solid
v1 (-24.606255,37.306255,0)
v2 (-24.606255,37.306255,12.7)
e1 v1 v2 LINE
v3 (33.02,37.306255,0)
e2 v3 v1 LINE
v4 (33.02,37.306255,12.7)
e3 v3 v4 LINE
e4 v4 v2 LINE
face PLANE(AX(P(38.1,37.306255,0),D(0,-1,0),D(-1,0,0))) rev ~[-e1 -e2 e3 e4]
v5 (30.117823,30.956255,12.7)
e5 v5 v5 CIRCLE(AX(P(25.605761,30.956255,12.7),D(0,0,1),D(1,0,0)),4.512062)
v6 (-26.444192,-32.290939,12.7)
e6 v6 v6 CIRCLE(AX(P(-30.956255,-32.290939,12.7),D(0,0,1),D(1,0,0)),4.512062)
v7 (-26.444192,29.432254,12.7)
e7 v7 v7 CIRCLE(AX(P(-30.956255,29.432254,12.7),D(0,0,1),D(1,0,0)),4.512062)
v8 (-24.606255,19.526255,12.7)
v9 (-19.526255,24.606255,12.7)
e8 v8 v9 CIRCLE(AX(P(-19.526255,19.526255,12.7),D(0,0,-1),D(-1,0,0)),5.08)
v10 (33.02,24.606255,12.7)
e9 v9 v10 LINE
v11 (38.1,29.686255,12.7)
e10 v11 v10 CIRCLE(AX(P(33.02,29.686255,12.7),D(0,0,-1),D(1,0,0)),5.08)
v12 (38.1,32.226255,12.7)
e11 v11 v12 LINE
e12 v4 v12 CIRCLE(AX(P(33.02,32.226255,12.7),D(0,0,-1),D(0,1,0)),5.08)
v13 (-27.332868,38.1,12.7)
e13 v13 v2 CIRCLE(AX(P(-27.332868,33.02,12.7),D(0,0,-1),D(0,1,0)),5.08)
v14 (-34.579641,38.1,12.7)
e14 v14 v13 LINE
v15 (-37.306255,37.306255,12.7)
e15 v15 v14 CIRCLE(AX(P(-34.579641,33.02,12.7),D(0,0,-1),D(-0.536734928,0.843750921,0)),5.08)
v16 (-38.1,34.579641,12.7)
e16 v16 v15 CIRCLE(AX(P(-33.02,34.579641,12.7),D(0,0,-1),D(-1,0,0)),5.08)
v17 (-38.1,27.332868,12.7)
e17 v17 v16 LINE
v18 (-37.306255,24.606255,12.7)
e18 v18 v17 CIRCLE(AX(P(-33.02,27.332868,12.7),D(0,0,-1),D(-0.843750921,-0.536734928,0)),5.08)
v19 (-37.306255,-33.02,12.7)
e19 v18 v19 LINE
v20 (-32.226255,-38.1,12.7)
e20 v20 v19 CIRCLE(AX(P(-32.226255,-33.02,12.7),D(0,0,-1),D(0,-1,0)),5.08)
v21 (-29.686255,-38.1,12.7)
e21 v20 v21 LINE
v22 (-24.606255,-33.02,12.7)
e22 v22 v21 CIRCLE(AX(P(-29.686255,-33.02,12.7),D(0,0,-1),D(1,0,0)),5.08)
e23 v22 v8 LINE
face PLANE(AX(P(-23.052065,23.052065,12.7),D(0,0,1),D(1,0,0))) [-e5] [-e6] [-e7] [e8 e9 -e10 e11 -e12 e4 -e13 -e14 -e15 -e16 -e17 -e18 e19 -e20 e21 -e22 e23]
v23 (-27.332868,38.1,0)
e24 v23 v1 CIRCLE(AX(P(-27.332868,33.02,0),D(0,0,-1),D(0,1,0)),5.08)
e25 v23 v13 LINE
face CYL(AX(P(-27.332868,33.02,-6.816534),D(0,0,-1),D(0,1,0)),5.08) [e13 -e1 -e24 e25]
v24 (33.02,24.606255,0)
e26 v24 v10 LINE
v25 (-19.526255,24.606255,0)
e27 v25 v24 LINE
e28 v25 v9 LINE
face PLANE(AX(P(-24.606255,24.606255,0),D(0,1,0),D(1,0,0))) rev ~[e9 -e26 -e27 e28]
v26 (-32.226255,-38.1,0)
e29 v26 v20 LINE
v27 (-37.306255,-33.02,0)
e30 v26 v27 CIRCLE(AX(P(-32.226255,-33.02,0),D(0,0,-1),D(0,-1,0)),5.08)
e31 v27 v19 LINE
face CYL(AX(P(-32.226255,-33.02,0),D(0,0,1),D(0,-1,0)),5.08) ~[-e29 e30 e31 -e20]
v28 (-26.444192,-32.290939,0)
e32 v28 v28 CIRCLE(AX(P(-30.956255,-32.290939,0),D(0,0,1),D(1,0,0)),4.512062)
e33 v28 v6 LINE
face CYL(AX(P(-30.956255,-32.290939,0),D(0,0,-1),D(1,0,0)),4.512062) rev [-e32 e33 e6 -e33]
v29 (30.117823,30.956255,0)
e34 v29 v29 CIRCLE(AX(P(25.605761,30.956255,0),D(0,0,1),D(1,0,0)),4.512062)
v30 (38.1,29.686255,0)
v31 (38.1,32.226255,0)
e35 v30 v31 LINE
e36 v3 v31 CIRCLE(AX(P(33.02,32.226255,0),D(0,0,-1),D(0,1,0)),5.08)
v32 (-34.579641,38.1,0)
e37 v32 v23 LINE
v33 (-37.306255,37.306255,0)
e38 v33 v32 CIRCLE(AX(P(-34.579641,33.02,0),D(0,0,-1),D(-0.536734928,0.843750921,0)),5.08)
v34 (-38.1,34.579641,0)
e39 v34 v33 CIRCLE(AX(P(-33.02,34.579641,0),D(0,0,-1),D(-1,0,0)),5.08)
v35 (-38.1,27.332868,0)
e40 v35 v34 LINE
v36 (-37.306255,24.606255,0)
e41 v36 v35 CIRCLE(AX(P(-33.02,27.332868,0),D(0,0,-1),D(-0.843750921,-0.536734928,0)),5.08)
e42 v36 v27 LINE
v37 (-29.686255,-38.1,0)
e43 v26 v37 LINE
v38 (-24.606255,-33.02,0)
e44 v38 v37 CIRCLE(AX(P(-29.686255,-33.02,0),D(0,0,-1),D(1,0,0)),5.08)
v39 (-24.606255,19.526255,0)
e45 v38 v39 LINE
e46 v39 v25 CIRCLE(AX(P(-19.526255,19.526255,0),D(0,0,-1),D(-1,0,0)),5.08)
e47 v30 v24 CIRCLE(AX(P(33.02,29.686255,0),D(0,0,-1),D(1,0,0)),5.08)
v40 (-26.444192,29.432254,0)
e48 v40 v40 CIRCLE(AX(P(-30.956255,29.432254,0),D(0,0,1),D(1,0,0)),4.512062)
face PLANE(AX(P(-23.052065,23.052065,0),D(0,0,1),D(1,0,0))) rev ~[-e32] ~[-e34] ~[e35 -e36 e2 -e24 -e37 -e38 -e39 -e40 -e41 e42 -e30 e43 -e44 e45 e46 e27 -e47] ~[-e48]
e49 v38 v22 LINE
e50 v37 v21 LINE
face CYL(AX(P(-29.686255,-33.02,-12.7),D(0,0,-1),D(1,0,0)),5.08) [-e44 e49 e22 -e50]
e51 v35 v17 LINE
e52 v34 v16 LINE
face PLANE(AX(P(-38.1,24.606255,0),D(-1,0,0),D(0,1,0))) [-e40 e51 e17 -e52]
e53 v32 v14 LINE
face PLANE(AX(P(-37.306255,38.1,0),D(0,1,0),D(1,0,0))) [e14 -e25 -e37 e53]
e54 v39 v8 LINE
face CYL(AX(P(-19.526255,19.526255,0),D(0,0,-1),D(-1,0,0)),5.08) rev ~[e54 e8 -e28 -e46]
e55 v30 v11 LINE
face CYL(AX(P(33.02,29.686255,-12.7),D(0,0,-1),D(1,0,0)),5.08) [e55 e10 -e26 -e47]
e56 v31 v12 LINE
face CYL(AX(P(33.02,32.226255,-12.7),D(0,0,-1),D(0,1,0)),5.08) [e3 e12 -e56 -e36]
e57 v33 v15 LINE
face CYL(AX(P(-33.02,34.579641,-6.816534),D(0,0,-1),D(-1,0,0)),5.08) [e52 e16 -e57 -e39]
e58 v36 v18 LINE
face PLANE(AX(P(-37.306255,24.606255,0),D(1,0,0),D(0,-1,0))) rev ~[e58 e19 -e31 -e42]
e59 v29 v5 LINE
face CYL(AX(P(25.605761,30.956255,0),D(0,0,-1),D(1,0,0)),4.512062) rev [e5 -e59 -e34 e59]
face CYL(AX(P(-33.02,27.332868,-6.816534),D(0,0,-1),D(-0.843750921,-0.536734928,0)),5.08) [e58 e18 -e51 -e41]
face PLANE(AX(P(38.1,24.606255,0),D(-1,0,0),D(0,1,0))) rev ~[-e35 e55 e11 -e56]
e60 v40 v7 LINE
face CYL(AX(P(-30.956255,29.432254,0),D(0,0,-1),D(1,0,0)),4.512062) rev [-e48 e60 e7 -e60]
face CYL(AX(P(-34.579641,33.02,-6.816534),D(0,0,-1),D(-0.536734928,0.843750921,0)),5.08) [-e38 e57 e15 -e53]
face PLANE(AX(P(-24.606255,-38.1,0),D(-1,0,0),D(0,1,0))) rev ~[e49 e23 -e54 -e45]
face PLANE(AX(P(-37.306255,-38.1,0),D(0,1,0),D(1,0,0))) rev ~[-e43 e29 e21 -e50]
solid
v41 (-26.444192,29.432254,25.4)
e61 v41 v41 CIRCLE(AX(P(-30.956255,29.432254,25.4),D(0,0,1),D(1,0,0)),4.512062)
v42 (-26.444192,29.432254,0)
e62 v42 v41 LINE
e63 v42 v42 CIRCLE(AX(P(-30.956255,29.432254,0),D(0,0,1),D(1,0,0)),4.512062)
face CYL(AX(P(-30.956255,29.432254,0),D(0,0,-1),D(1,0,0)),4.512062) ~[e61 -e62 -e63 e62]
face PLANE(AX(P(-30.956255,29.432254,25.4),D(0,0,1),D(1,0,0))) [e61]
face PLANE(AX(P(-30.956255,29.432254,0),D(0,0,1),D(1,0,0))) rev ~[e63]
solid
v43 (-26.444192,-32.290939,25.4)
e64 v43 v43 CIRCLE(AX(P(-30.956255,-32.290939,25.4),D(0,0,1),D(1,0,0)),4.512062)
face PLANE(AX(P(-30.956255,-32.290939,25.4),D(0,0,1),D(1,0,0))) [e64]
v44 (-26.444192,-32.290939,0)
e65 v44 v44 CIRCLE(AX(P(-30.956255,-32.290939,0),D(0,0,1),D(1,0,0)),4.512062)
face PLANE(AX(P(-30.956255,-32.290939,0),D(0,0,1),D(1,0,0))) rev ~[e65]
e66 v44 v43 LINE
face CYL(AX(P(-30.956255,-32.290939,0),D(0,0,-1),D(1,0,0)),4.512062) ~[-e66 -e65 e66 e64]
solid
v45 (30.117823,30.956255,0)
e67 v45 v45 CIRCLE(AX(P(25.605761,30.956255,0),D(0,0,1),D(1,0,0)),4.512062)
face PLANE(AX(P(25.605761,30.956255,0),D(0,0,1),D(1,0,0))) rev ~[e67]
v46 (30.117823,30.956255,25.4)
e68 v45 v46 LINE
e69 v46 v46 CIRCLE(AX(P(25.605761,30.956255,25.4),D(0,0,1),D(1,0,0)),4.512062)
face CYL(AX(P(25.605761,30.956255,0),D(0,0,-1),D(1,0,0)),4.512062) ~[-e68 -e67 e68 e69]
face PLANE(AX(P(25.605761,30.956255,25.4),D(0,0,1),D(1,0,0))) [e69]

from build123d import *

# Parameters (mm, degrees)
F0_R         = 4.5120624022
F1_DEPTH     = 25.4
F0_W         = 0.7937453203
F0_H         = 12.7
F0_W_2       = 12.7
F0_H_2       = 0.7937453203
F2_DEPTH     = 12.7
F3_R         = 5.08
F4_T1_DEPTH  = 12.7
F4_T3_DEPTH  = 26.333067172
F4_T5_DEPTH  = 38.1
F4_T7_DEPTH  = 26.333067172
F4_T9_DEPTH  = 38.1
F4_T11_DEPTH = 26.333067172
F4_T13_DEPTH = 38.1
F4_T15_DEPTH = 26.333067172


# Not quite as in the source:
# - a fillet or chamfer that OpenCascade refuses, or shapes differently, is made with other operations: its cross-section is extruded or revolved along the edge and cut away or added


with BuildPart() as f1:
    # F0 (on Top) → F1 (new body)
    with BuildSketch(Plane.XY):
        with Locations((-30.9562546797, 29.4322539121)):
            Circle(F0_R)
    extrude(amount=F1_DEPTH)


with BuildPart() as f1b:
    # F0 (on Top) → F1, piece 2 (new body)
    with BuildSketch(Plane.XY):
        with Locations((25.6057605147, 30.9562546797)):
            Circle(F0_R)
    extrude(amount=F1_DEPTH)


with BuildPart() as f1c:
    # F0 (on Top) → F1, piece 3 (new body)
    with BuildSketch(Plane.XY):
        with Locations((-30.9562546797, -32.2909392416)):
            Circle(F0_R)
    extrude(amount=F1_DEPTH)


with BuildPart() as f2:
    # F0 (on Top) → F2 (new body)
    with BuildSketch(Plane.XY):
        Polygon((-37.3062546797, -38.1), (-24.6062546797, -38.1), (-24.6062546797, 24.6062546797), (38.1, 24.6062546797), (38.1, 37.3062546797), (-24.6062546797, 37.3062546797), (-37.3062546797, 37.3062546797), (-37.3062546797, 24.6062546797), align=None)
        with Locations((-30.9562546797, -32.2909392416)):
            Circle(F0_R, mode=Mode.SUBTRACT)
        with Locations((-30.9562546797, 29.4322539121)):
            Circle(F0_R, mode=Mode.SUBTRACT)
        with Locations((25.6057605147, 30.9562546797)):
            Circle(F0_R, mode=Mode.SUBTRACT)
        with Locations((-37.7031273399, 30.9562546797)):
            Rectangle(F0_W, F0_H)
        with Locations((-30.9562546797, 37.7031273399)):
            Rectangle(F0_W_2, F0_H_2)
    extrude(amount=F2_DEPTH)

    # F3
    f3_edges = [f2.edges().sort_by_distance(p)[0] for p in [
        (-37.306255, -38.1, 6.35),
    ]]
    fillet(f3_edges, radius=F3_R)

    # F4: fillet of radius 5.08 on 8 edges, made by hand

    # F4_s2 → F4_t1 (join)
    with BuildSketch(Plane.XY):
        with BuildLine():
            ThreePointArc((-24.6062546797, 19.5262546797), (-23.1183571281, 23.1183571281), (-19.5262546797, 24.6062546797))
            Line((-19.5262546797, 24.6062546797), (-24.6062546797, 24.6062546797))
            Line((-24.6062546797, 24.6062546797), (-24.6062546797, 19.5262546797))
        make_face()
    extrude(amount=F4_T1_DEPTH)

    # F4_s4 → F4_t3 (cut)
    with BuildSketch(Plane.XY.offset(-6.816533586)):
        with BuildLine():
            ThreePointArc((-37.3062546797, 24.6062546797), (-37.8975287684, 25.9129691341), (-38.1, 27.3328681141))
            Line((-38.1, 27.3328681141), (-38.1, 24.6062546797))
            Line((-38.1, 24.6062546797), (-37.3062546797, 24.6062546797))
        make_face()
    extrude(amount=F4_T3_DEPTH, mode=Mode.SUBTRACT)

    # F4_s6 → F4_t5 (cut)
    with BuildSketch(Plane.XY.offset(-12.7)):
        with BuildLine():
            ThreePointArc((-24.6062546797, -33.02), (-26.0941522313, -36.6121024484), (-29.6862546797, -38.1))
            Line((-29.6862546797, -38.1), (-24.6062546797, -38.1))
            Line((-24.6062546797, -38.1), (-24.6062546797, -33.02))
        make_face()
    extrude(amount=F4_T5_DEPTH, mode=Mode.SUBTRACT)

    # F4_s8 → F4_t7 (cut)
    with BuildSketch(Plane.XY.offset(-6.816533586)):
        with BuildLine():
            ThreePointArc((-38.1, 34.5796412453), (-37.8975287684, 35.9995402254), (-37.3062546797, 37.3062546797))
            Line((-37.3062546797, 37.3062546797), (-38.1, 37.3062546797))
            Line((-38.1, 37.3062546797), (-38.1, 34.5796412453))
        make_face()
    extrude(amount=F4_T7_DEPTH, mode=Mode.SUBTRACT)

    # F4_s10 → F4_t9 (cut)
    with BuildSketch(Plane.XY.offset(-12.7)):
        with BuildLine():
            ThreePointArc((38.1, 29.6862546797), (36.6121024484, 26.0941522313), (33.02, 24.6062546797))
            Line((33.02, 24.6062546797), (38.1, 24.6062546797))
            Line((38.1, 24.6062546797), (38.1, 29.6862546797))
        make_face()
    extrude(amount=F4_T9_DEPTH, mode=Mode.SUBTRACT)

    # F4_s12 → F4_t11 (cut)
    with BuildSketch(Plane.XY.offset(-6.816533586)):
        with BuildLine():
            ThreePointArc((-37.3062546797, 37.3062546797), (-35.9995402254, 37.8975287684), (-34.5796412453, 38.1))
            Line((-34.5796412453, 38.1), (-37.3062546797, 38.1))
            Line((-37.3062546797, 38.1), (-37.3062546797, 37.3062546797))
        make_face()
    extrude(amount=F4_T11_DEPTH, mode=Mode.SUBTRACT)

    # F4_s14 → F4_t13 (cut)
    with BuildSketch(Plane.XY.offset(-12.7)):
        with BuildLine():
            ThreePointArc((33.02, 37.3062546797), (36.6121024484, 35.8183571281), (38.1, 32.2262546797))
            Line((38.1, 32.2262546797), (38.1, 37.3062546797))
            Line((38.1, 37.3062546797), (33.02, 37.3062546797))
        make_face()
    extrude(amount=F4_T13_DEPTH, mode=Mode.SUBTRACT)

    # F4_s16 → F4_t15 (cut)
    with BuildSketch(Plane.XY.offset(-6.816533586)):
        with BuildLine():
            ThreePointArc((-27.3328681141, 38.1), (-25.9129691341, 37.8975287684), (-24.6062546797, 37.3062546797))
            Line((-24.6062546797, 37.3062546797), (-24.6062546797, 38.1))
            Line((-24.6062546797, 38.1), (-27.3328681141, 38.1))
        make_face()
    extrude(amount=F4_T15_DEPTH, mode=Mode.SUBTRACT)


solid = Compound([f1.part, f1b.part, f1c.part, f2.part])
